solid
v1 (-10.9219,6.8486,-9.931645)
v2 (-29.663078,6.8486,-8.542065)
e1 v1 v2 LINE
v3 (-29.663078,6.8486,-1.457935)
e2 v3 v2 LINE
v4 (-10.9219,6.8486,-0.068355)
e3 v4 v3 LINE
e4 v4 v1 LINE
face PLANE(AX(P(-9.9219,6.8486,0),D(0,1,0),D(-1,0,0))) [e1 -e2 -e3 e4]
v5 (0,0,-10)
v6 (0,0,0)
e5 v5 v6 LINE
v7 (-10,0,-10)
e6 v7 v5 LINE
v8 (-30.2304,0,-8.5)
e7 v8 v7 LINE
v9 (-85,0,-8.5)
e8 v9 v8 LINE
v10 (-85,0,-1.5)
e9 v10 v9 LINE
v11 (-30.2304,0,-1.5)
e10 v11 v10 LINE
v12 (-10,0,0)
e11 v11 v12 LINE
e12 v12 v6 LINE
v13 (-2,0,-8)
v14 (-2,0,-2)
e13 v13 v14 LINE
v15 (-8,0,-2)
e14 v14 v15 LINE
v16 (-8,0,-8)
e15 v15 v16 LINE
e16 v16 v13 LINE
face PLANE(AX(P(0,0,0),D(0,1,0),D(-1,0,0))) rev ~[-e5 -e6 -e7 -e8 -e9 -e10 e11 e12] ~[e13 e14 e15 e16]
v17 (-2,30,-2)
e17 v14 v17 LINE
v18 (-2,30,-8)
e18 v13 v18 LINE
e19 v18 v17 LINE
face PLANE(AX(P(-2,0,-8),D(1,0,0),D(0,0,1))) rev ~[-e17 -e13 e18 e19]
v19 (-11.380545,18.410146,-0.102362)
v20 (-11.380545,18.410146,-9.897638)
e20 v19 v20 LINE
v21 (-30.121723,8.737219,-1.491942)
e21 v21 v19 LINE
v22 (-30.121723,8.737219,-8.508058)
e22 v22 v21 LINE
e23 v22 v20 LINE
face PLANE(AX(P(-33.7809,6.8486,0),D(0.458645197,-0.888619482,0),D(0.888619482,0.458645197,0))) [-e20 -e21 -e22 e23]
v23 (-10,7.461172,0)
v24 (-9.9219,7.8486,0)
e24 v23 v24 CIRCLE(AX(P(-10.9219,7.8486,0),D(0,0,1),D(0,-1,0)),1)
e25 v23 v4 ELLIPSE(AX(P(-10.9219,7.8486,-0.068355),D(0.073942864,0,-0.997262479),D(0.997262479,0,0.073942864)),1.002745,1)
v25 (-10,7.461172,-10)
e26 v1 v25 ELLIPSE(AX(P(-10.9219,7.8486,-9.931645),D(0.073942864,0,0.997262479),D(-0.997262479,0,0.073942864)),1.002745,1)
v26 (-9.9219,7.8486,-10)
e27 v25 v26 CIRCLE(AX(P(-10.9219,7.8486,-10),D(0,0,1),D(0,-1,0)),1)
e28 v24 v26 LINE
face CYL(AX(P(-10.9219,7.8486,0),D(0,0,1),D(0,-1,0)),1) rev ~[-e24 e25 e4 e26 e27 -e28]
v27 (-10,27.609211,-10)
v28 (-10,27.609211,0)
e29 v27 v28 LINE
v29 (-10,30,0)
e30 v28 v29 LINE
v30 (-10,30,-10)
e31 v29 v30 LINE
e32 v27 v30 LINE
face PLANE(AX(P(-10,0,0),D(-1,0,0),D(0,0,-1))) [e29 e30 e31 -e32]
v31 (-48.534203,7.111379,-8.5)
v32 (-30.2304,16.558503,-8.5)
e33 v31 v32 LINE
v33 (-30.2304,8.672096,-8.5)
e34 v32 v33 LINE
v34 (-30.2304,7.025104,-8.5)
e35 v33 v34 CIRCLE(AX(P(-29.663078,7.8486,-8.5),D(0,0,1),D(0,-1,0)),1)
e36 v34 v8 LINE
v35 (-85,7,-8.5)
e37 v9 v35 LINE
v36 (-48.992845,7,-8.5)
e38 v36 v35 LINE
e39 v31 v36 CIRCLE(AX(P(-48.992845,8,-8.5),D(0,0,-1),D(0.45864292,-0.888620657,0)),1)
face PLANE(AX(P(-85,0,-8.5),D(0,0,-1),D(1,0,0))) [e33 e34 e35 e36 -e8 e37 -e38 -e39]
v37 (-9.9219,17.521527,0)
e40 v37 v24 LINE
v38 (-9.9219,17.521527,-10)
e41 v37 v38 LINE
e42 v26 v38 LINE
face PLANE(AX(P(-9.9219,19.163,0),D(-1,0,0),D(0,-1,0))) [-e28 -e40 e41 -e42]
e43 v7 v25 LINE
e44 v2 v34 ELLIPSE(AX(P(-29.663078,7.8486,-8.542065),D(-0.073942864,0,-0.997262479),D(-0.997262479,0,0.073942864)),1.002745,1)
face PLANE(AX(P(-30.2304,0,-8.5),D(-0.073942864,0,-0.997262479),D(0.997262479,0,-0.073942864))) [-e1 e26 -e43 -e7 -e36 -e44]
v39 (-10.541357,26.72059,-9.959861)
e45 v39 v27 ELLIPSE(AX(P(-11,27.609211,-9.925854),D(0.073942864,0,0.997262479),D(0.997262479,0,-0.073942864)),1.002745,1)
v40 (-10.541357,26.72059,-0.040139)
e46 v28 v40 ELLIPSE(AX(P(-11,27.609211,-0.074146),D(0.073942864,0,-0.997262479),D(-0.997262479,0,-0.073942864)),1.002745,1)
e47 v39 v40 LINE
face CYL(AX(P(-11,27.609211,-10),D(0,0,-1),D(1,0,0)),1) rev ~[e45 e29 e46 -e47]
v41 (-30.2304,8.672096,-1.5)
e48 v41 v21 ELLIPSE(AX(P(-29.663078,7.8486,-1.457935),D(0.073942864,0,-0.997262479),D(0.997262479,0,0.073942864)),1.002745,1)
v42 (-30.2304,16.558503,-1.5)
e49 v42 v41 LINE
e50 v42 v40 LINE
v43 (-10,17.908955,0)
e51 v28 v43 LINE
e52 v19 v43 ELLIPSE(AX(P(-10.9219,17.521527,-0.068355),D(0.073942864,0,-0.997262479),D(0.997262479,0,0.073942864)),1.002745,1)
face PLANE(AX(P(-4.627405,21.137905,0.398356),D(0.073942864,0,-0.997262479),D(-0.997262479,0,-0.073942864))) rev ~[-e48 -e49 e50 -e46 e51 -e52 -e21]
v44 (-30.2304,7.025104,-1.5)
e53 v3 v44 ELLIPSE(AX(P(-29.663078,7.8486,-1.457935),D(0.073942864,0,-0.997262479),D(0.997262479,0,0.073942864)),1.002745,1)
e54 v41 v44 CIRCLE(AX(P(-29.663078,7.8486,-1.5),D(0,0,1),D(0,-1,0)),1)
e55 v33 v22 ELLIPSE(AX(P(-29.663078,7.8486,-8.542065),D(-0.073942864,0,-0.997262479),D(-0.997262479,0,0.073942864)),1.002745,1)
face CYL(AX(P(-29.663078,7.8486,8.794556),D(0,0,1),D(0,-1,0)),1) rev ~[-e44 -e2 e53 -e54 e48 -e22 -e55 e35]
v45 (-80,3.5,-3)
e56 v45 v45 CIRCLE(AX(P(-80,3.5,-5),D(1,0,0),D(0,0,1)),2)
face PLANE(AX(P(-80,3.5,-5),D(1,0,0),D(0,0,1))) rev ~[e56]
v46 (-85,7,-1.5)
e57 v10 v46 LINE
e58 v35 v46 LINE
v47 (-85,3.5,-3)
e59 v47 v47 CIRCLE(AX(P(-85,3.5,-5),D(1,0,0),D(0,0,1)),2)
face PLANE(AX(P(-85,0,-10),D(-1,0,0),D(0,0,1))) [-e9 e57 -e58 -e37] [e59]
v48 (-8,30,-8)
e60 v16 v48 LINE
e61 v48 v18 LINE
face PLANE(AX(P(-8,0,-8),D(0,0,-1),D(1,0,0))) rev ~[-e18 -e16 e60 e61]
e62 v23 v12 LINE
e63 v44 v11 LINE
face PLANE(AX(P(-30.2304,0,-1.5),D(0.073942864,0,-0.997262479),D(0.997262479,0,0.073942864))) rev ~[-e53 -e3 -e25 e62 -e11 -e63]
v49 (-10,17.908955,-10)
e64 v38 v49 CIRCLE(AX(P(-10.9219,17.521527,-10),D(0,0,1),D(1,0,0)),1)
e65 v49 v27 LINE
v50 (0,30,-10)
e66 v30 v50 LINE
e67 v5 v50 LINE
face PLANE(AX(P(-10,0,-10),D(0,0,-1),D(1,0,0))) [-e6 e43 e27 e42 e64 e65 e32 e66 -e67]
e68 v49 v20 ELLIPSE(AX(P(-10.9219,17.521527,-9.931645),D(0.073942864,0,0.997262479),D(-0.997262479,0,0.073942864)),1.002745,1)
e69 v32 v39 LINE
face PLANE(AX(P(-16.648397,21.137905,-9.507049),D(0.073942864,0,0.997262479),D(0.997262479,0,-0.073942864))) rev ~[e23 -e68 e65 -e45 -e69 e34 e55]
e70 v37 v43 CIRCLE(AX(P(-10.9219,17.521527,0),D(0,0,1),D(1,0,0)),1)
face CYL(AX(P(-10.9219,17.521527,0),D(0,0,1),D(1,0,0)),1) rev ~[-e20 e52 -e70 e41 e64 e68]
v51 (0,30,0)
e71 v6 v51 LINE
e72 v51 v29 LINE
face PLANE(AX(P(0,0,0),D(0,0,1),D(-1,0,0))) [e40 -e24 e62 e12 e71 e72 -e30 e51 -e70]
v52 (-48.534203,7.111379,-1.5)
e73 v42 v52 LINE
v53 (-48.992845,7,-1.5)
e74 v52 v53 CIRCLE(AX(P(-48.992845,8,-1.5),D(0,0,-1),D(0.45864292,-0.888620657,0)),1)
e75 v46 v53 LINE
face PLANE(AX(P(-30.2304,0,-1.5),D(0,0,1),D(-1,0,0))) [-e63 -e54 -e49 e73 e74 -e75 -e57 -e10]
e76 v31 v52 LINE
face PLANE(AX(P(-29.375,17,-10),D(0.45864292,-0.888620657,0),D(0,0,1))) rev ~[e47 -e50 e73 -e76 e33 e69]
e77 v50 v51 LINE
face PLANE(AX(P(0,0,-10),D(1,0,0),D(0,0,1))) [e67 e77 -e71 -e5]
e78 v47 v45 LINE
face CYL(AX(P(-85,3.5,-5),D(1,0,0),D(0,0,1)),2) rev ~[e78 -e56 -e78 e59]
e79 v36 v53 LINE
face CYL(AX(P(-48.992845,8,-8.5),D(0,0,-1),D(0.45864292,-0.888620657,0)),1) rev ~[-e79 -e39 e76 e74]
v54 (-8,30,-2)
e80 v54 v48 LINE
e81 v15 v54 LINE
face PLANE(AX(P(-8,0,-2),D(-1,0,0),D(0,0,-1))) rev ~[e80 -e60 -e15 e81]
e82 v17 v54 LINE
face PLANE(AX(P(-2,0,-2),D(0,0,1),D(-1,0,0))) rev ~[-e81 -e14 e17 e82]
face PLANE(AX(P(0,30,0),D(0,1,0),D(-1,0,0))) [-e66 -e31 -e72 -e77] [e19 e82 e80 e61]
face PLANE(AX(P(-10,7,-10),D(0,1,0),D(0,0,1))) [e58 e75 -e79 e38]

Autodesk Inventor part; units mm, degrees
ref_plane "YZ Plane" through (0, 0, 0) normal (1, 0, 0) x (0, 1, 0)
ref_plane "XZ Plane" through (0, 0, 0) normal (0, 1, 0) x (-1, 0, 0)
ref_plane "XY Plane" through (0, 0, 0) normal (0, 0, 1) x (1, 0, 0)
sketch "Sketch1" plane through (0, 0, 0) normal (0, 1, 0) x (-1, 0, 0)
  line L0 (0, 0) -> (10, 0)
  line L1 (10, 0) -> (10, -10)
  line L2 (10, -10) -> (0, -10)
  line L3 (0, -10) -> (0, 0)
  line L4 (10, 0) -> (0, -10) construction
  line L5 (10, -10) -> (0, 0) construction
  line L6 (2, -2) -> (8, -2)
  line L7 (8, -2) -> (8, -8)
  line L8 (8, -8) -> (2, -8)
  line L9 (2, -8) -> (2, -2)
  line L10 (2, -2) -> (8, -8) construction
  line L11 (8, -2) -> (2, -8) construction
  point P0 (5, -5)
  dimension "d0" = 10
  dimension "d4" = 6
  dimension "d5" = 6
extrude "Extrusion1" add sketch "Sketch1" along normal blind 30
sketch "Sketch2" plane through (-10, 0, -10) normal (-1, 0, 0) x (0, 0, 1)
  line L0 (0, 30) -> (10, 30) construction
  line L1 (10, 0) -> (0, 0) projected
  line L2 (10, 0) -> (0, 0) construction
  line L3 (0, 0) -> (0, 7)
  line L4 (0, 7) -> (10, 7)
  line L5 (10, 7) -> (10, 0)
  line L6 (0, 0) -> (0, 30) construction
  line L7 (10, 0) -> (10, 30) construction
  dimension "d8" = 7
  dimension "d9" = 10
extrude "Extrusion2" add sketch "Sketch2" along normal blind 75
chamfer "Chamfer1" distance 20 distance2 38.75 1 edges at (-10, 7, -5) measured on face at (-10, 14.6667, -6.6667)
sketch "Sketch3" plane through (0, 0, 0) normal (0, 0, 1) x (1, 0, 0)
  line L0 (-48.75, 7) -> (-85, 7) construction
  line L1 (-10, 27) -> (-10, 30) construction
  line L2 (-9.9219, 6.8486) -> (-33.7809, 6.8486)
  line L3 (-33.7809, 6.8486) -> (-9.9219, 19.163)
  line L4 (-9.9219, 19.163) -> (-9.9219, 6.8486)
  line L5 (-48.75, 7) -> (-10, 27) projected
  point P0 (0, 0)
  dimension "d21" = 7
extrude "Extrusion3" cut sketch "Sketch3" against normal through all
sketch "Sketch6" plane through (0, 0, 0) normal (0, -1, 0) x (1, 0, 0)
  line L0 (-85, -10) -> (-85, 0) construction
  line L1 (-85, -5) -> (0, -5) construction
  line L2 (0, 0) -> (0, -10) construction
  line L3 (-30.2304, -1.5) -> (-85, -1.5)
  line L4 (-85, -1.5) -> (-85, -8.5)
  line L5 (-85, -8.5) -> (-30.2304, -8.5)
  line L6 (-30.2304, -8.5) -> (-30.2304, -1.5) construction
  line L7 (-30.2304, -1.5) -> (-85, -8.5) construction
  line L8 (-85, -1.5) -> (-30.2304, -8.5) construction
  line L9 (-30.2304, -8.5) -> (0, -8.5) construction
  line L10 (-30.2304, -1.5) -> (0, -1.5) construction
  line L11 (-30.2304, -8.5) -> (-10, -10)
  line L12 (0, -10) -> (-10, -10) construction
  line L13 (-30.2304, -1.5) -> (-10, 0)
  line L14 (-10, 0) -> (0, 0) construction
  line L15 (-10, -10) -> (-10, -18.6026)
  line L16 (-10, -18.6026) -> (-95.3433, -18.6026)
  line L17 (-95.3433, -18.6026) -> (-95.3433, 10.4)
  line L18 (-95.3433, 10.4) -> (-10, 10.4)
  line L19 (-10, 10.4) -> (-10, 0)
  point P0 (-57.6152, -5)
  dimension "d22" = 7
extrude "Extrusion5" cut sketch "Sketch6" against normal through all
hole "Hole1" at (-85, 3.5, -5) direction (1, 0, 0) diameter 4 depth 5
fillet "Fillet1" radius 1 5 edges at (-33.7809, 6.8486, -5) (-9.9219, 6.8486, -5) (-9.9219, 19.163, -5) (-48.75, 7, -5) (-10, 27, -5)
properties part number "foot_1_2"
